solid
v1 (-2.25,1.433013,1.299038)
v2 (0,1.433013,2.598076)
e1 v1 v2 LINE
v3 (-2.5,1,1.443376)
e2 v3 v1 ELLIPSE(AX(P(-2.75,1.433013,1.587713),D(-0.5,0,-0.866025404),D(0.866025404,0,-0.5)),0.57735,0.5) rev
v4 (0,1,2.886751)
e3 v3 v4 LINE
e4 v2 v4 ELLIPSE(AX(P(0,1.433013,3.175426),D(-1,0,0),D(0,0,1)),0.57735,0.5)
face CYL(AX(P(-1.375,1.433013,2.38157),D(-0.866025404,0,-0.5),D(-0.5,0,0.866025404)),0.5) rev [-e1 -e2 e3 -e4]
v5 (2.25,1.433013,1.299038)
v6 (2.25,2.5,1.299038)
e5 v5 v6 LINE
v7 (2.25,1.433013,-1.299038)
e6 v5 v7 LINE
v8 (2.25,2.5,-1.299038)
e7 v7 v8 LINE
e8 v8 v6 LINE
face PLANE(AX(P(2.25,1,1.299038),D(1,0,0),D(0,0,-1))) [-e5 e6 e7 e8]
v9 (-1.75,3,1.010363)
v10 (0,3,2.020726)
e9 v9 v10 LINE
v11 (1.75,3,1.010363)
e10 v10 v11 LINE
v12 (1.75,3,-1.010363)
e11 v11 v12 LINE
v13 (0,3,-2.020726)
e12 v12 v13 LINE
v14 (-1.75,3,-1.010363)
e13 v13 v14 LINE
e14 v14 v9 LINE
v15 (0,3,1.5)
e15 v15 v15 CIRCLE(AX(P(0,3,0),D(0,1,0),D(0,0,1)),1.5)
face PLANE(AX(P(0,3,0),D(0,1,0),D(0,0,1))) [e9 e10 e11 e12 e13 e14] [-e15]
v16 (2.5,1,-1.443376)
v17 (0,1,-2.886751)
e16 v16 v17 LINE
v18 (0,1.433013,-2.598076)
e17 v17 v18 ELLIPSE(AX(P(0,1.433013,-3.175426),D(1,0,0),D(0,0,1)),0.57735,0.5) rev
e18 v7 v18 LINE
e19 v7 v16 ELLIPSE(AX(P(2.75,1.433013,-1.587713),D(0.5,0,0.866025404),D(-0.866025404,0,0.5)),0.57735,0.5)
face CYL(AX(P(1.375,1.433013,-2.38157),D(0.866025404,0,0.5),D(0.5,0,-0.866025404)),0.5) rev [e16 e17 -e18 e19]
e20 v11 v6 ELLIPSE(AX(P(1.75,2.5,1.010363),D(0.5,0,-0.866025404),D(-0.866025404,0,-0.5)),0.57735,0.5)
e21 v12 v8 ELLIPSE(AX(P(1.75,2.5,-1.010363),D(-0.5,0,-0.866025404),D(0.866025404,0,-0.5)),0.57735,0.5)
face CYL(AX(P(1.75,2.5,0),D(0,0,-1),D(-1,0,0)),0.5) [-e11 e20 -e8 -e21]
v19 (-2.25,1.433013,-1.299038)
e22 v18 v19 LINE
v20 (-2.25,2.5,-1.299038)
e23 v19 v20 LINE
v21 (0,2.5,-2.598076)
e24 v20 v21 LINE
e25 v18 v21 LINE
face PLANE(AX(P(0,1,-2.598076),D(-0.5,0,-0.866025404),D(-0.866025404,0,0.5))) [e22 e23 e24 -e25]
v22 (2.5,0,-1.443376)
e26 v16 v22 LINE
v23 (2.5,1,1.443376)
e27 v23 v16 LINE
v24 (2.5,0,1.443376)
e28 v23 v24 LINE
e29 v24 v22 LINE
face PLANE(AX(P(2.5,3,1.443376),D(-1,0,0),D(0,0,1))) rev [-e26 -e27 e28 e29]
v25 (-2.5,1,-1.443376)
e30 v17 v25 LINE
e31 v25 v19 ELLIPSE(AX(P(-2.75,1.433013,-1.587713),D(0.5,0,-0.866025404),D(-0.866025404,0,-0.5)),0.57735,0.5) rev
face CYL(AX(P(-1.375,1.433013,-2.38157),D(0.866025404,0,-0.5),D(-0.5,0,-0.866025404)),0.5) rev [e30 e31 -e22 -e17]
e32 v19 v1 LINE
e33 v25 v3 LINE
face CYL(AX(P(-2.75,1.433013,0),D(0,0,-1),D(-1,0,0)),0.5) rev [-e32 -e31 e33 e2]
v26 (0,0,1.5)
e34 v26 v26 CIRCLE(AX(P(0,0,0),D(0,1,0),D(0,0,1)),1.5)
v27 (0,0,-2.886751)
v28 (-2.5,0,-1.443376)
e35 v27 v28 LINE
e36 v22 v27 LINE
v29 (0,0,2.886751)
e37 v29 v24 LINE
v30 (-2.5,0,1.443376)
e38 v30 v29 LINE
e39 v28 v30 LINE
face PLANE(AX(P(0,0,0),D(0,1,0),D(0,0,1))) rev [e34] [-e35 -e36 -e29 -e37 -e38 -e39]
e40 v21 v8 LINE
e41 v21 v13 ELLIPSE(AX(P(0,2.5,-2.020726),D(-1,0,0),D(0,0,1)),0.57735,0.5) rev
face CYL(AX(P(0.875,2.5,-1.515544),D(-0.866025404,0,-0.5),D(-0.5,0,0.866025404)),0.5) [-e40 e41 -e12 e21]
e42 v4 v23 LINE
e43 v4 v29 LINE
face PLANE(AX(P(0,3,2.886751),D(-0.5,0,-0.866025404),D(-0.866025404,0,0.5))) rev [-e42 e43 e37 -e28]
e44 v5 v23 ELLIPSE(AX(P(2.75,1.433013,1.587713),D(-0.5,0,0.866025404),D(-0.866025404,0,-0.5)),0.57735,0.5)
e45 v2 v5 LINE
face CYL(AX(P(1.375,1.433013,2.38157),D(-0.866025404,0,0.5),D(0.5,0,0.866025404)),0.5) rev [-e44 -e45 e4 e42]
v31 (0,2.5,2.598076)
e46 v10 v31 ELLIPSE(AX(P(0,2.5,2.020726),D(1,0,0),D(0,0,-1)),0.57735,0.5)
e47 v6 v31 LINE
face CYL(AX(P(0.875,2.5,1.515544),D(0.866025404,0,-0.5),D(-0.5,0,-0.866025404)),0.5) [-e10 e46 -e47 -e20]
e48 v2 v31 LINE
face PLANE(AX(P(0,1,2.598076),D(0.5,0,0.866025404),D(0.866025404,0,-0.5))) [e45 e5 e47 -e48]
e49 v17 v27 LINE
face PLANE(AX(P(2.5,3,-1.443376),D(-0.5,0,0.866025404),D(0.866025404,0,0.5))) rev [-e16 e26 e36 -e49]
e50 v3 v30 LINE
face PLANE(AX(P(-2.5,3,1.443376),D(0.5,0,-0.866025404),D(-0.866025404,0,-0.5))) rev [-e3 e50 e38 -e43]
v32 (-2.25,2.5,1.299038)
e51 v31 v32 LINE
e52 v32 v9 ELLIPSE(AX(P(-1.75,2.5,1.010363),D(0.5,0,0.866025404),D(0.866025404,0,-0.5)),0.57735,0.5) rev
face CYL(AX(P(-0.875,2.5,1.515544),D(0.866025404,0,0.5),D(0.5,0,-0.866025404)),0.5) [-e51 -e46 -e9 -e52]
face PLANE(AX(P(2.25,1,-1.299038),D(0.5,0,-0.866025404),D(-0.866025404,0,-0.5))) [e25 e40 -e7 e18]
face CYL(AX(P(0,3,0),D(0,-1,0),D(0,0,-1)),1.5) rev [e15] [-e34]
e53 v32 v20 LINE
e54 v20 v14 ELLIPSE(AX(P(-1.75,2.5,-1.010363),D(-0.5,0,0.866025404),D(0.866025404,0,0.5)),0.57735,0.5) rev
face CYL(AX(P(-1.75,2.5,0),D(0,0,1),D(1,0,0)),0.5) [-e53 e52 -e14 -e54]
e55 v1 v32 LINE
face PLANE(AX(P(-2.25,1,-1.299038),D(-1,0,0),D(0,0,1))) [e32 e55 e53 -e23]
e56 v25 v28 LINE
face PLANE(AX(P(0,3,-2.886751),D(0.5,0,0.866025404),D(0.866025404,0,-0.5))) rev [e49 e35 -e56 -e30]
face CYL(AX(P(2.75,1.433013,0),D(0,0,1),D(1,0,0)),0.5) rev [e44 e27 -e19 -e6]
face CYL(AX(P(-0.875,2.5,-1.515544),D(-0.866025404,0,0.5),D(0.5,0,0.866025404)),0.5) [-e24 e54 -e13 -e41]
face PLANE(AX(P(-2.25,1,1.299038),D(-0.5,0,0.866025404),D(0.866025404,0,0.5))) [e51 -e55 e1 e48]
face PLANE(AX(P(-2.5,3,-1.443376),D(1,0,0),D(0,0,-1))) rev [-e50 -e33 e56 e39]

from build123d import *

# Parameters (mm, degrees)
SKETCH1_R           = 1.5
BOSS_EXTRUDE1_DEPTH = 3
SKETCH2_R           = 3.632993492
CUT_EXTRUDE1_DEPTH  = 2
FILLET1_R           = 0.5


with BuildPart() as part:
    # Sketch1 → Boss-Extrude1 (new body)
    with BuildSketch(Plane(origin=(0, 0, 0), x_dir=(1, 0, 0), z_dir=(0, 1, 0))):
        Polygon((0, -2.886751346), (2.5, -1.443375673), (2.5, 1.443375673), (0, 2.886751346), (-2.5, 1.443375673), (-2.5, -1.443375673), align=None)
        with Locations(Location((0, 0, 0), (0, 0, 270))):
            Circle(SKETCH1_R, mode=Mode.SUBTRACT)
    extrude(amount=BOSS_EXTRUDE1_DEPTH)

    # Sketch2 → Cut-Extrude1 (cut)
    with BuildSketch(Plane(origin=(0, 3, 0), x_dir=(1, 0, 0), z_dir=(0, 1, 0))):
        Circle(SKETCH2_R)
        Polygon((2.25, 1.299038106), (0, 2.598076211), (-2.25, 1.299038106), (-2.25, -1.299038106), (0, -2.598076211), (2.25, -1.299038106), align=None, mode=Mode.SUBTRACT)
    extrude(amount=-CUT_EXTRUDE1_DEPTH, mode=Mode.SUBTRACT)

    # Fillet1
    # the kernel refuses this fillet: 0.5 mm, written as the material it adds along each edge
    with BuildSketch(Plane(origin=(-0.9375, 1, 3.139342089), x_dir=(0.5000000000000002, 7.10542735760069e-14, 0.8660254037844385), z_dir=(0.8660254037844386, 0, -0.5000000000000002))) as fillet1_piece_1_section:
        with BuildLine():
            CenterArc((0.5, -0.433012702), FILLET1_R, 120, 60)
            Line((0, -0.433012702), (0, 0))
            Line((0, 0), (0.25, 0))
        make_face()
    fillet1_piece_1 = extrude(amount=4.763139721, mode=Mode.PRIVATE)
    fillet1_piece_1 = split(fillet1_piece_1, bisect_by=Plane(origin=(2.25, 1, 3.139342089), z_dir=(-1, 0, 0)), keep=Keep.TOP, mode=Mode.PRIVATE)
    fillet1_piece_1 = split(fillet1_piece_1, bisect_by=Plane(origin=(-0.46875, 1, 2.327443273), z_dir=(0.4999999999999999, 0, -0.8660254037844387)), keep=Keep.TOP, mode=Mode.PRIVATE)
    add(fillet1_piece_1)
    with BuildSketch(Plane(origin=(2.25, 1, 2.38156986), x_dir=(1, 0, 0), z_dir=(0, 0, -1))) as fillet1_piece_2_section:
        with BuildLine():
            CenterArc((0.5, -0.433012702), FILLET1_R, 120, 60)
            Line((0, -0.433012702), (0, 0))
            Line((0, 0), (0.25, 0))
        make_face()
    fillet1_piece_2 = extrude(amount=4.763139721, mode=Mode.PRIVATE)
    fillet1_piece_2 = split(fillet1_piece_2, bisect_by=Plane(origin=(1.78125, 1, 1.569671044), z_dir=(-0.5000000000000002, 0, -0.8660254037844386)), keep=Keep.TOP, mode=Mode.PRIVATE)
    fillet1_piece_2 = split(fillet1_piece_2, bisect_by=Plane(origin=(3.84375, 1, -0.378886114), z_dir=(-0.49999999999999956, 0, 0.8660254037844389)), keep=Keep.TOP, mode=Mode.PRIVATE)
    add(fillet1_piece_2)
    with BuildSketch(Plane(origin=(3.1875, 1, -0.757772228), x_dir=(0.49999999999999956, 7.194245199570714e-14, -0.8660254037844388), z_dir=(-0.8660254037844389, 0, -0.49999999999999956))) as fillet1_piece_3_section:
        with BuildLine():
            CenterArc((0.5, -0.433012702), FILLET1_R, 120, 60)
            Line((0, -0.433012702), (0, 0))
            Line((0, 0), (0.25, 0))
        make_face()
    fillet1_piece_3 = extrude(amount=4.763139721, mode=Mode.PRIVATE)
    fillet1_piece_3 = split(fillet1_piece_3, bisect_by=Plane(origin=(2.25, 1, -0.757772228), z_dir=(-1, 0, 0)), keep=Keep.TOP, mode=Mode.PRIVATE)
    fillet1_piece_3 = split(fillet1_piece_3, bisect_by=Plane(origin=(1.59375, 1, -3.518228203), z_dir=(0.5000000000000002, 0, 0.8660254037844385)), keep=Keep.TOP, mode=Mode.PRIVATE)
    add(fillet1_piece_3)
    with BuildSketch(Plane(origin=(0.9375, 1, -3.139342089), x_dir=(-0.5000000000000003, 7.283063041540705e-14, -0.8660254037844386), z_dir=(-0.8660254037844386, 0, 0.5000000000000003))) as fillet1_piece_4_section:
        with BuildLine():
            CenterArc((0.5, -0.433012702), FILLET1_R, 120, 60)
            Line((0, -0.433012702), (0, 0))
            Line((0, 0), (0.25, 0))
        make_face()
    fillet1_piece_4 = extrude(amount=4.763139721, mode=Mode.PRIVATE)
    fillet1_piece_4 = split(fillet1_piece_4, bisect_by=Plane(origin=(0.46875, 1, -2.327443273), z_dir=(-0.49999999999999956, 0, 0.8660254037844389)), keep=Keep.TOP, mode=Mode.PRIVATE)
    fillet1_piece_4 = split(fillet1_piece_4, bisect_by=Plane(origin=(-2.25, 1, -3.139342089), z_dir=(1, 0, 0)), keep=Keep.TOP, mode=Mode.PRIVATE)
    add(fillet1_piece_4)
    with BuildSketch(Plane(origin=(-2.25, 1, -2.38156986), x_dir=(-1, 0, 0), z_dir=(0, 0, 1))) as fillet1_piece_5_section:
        with BuildLine():
            CenterArc((0.5, -0.433012702), FILLET1_R, 120, 60)
            Line((0, -0.433012702), (0, 0))
            Line((0, 0), (0.25, 0))
        make_face()
    fillet1_piece_5 = extrude(amount=4.763139721, mode=Mode.PRIVATE)
    fillet1_piece_5 = split(fillet1_piece_5, bisect_by=Plane(origin=(-3.84375, 1, 0.378886114), z_dir=(0.4999999999999999, 0, -0.8660254037844387)), keep=Keep.TOP, mode=Mode.PRIVATE)
    fillet1_piece_5 = split(fillet1_piece_5, bisect_by=Plane(origin=(-1.78125, 1, -1.569671044), z_dir=(0.5000000000000002, 0, 0.8660254037844385)), keep=Keep.TOP, mode=Mode.PRIVATE)
    add(fillet1_piece_5)
    with BuildSketch(Plane(origin=(-3.1875, 1, 0.757772228), x_dir=(-0.4999999999999999, 7.194245199570713e-14, 0.8660254037844387), z_dir=(0.8660254037844387, 0, 0.4999999999999999))) as fillet1_piece_6_section:
        with BuildLine():
            CenterArc((0.5, -0.433012702), FILLET1_R, 120, 60)
            Line((0, -0.433012702), (0, 0))
            Line((0, 0), (0.25, 0))
        make_face()
    fillet1_piece_6 = extrude(amount=4.763139721, mode=Mode.PRIVATE)
    fillet1_piece_6 = split(fillet1_piece_6, bisect_by=Plane(origin=(-1.59375, 1, 3.518228203), z_dir=(-0.5000000000000002, 0, -0.8660254037844386)), keep=Keep.TOP, mode=Mode.PRIVATE)
    fillet1_piece_6 = split(fillet1_piece_6, bisect_by=Plane(origin=(-2.25, 1, 0.757772228), z_dir=(1, 0, 0)), keep=Keep.TOP, mode=Mode.PRIVATE)
    add(fillet1_piece_6)
    with BuildSketch(Plane(origin=(-0.9375, 1, 3.139342089), x_dir=(0.5000000000000002, 7.10542735760069e-14, 0.8660254037844385), z_dir=(0.8660254037844386, 0, -0.5000000000000002))) as fillet1_piece_7a_section:
        with BuildLine():
            CenterArc((0.5, -0.433012702), FILLET1_R, 120, 60)
            Line((0, -0.433012702), (0, 0))
            Line((0, 0), (0.25, 0))
        make_face()
    fillet1_piece_7a = extrude(amount=4.763139721, mode=Mode.PRIVATE)
    fillet1_piece_7a = split(fillet1_piece_7a, bisect_by=Plane(origin=(-0.59375, 1, 2.543949624), z_dir=(0.49999999999999983, 0, -0.8660254037844387)), keep=Keep.TOP, mode=Mode.PRIVATE)
    fillet1_piece_7a = split(fillet1_piece_7a, bisect_by=Plane(origin=(-0.46875, 1, 2.327443273), z_dir=(-0.4999999999999999, 0, 0.8660254037844387)), keep=Keep.TOP, mode=Mode.PRIVATE)
    with BuildSketch(Plane(origin=(-3.1875, 1, 0.757772228), x_dir=(-0.4999999999999999, 7.194245199570713e-14, 0.8660254037844387), z_dir=(0.8660254037844387, 0, 0.4999999999999999))) as fillet1_piece_7b_section:
        with BuildLine():
            CenterArc((0.5, -0.433012702), FILLET1_R, 120, 60)
            Line((0, -0.433012702), (0, 0))
            Line((0, 0), (0.25, 0))
        make_face()
    fillet1_piece_7b = extrude(amount=4.763139721, mode=Mode.PRIVATE)
    fillet1_piece_7b = split(fillet1_piece_7b, bisect_by=Plane(origin=(-1.46875, 1, 3.734734554), z_dir=(-0.5000000000000001, 0, -0.8660254037844387)), keep=Keep.TOP, mode=Mode.PRIVATE)
    fillet1_piece_7b = split(fillet1_piece_7b, bisect_by=Plane(origin=(-1.59375, 1, 3.518228203), z_dir=(0.5000000000000002, 0, 0.8660254037844386)), keep=Keep.TOP, mode=Mode.PRIVATE)
    fillet1_piece_7 = fillet1_piece_7a & fillet1_piece_7b
    add(fillet1_piece_7)
    with BuildSketch(Plane(origin=(2.25, 1, 2.38156986), x_dir=(1, 0, 0), z_dir=(0, 0, -1))) as fillet1_piece_8a_section:
        with BuildLine():
            CenterArc((0.5, -0.433012702), FILLET1_R, 120, 60)
            Line((0, -0.433012702), (0, 0))
            Line((0, 0), (0.25, 0))
        make_face()
    fillet1_piece_8a = extrude(amount=4.763139721, mode=Mode.PRIVATE)
    fillet1_piece_8a = split(fillet1_piece_8a, bisect_by=Plane(origin=(1.90625, 1, 1.786177395), z_dir=(-0.5000000000000001, 0, -0.8660254037844387)), keep=Keep.TOP, mode=Mode.PRIVATE)
    fillet1_piece_8a = split(fillet1_piece_8a, bisect_by=Plane(origin=(1.78125, 1, 1.569671044), z_dir=(0.5000000000000002, 0, 0.8660254037844386)), keep=Keep.TOP, mode=Mode.PRIVATE)
    with BuildSketch(Plane(origin=(-0.9375, 1, 3.139342089), x_dir=(0.5000000000000002, 7.10542735760069e-14, 0.8660254037844385), z_dir=(0.8660254037844386, 0, -0.5000000000000002))) as fillet1_piece_8b_section:
        with BuildLine():
            CenterArc((0.5, -0.433012702), FILLET1_R, 120, 60)
            Line((0, -0.433012702), (0, 0))
            Line((0, 0), (0.25, 0))
        make_face()
    fillet1_piece_8b = extrude(amount=4.763139721, mode=Mode.PRIVATE)
    fillet1_piece_8b = split(fillet1_piece_8b, bisect_by=Plane(origin=(2.5, 1, 3.139342089), z_dir=(-1, 0, 0)), keep=Keep.TOP, mode=Mode.PRIVATE)
    fillet1_piece_8b = split(fillet1_piece_8b, bisect_by=Plane(origin=(2.25, 1, 3.139342089), z_dir=(1, 0, 0)), keep=Keep.TOP, mode=Mode.PRIVATE)
    fillet1_piece_8 = fillet1_piece_8a & fillet1_piece_8b
    add(fillet1_piece_8)
    with BuildSketch(Plane(origin=(2.25, 1, 2.38156986), x_dir=(1, 0, 0), z_dir=(0, 0, -1))) as fillet1_piece_9a_section:
        with BuildLine():
            CenterArc((0.5, -0.433012702), FILLET1_R, 120, 60)
            Line((0, -0.433012702), (0, 0))
            Line((0, 0), (0.25, 0))
        make_face()
    fillet1_piece_9a = extrude(amount=4.763139721, mode=Mode.PRIVATE)
    fillet1_piece_9a = split(fillet1_piece_9a, bisect_by=Plane(origin=(3.96875, 1, -0.595392465), z_dir=(-0.49999999999999967, 0, 0.8660254037844388)), keep=Keep.TOP, mode=Mode.PRIVATE)
    fillet1_piece_9a = split(fillet1_piece_9a, bisect_by=Plane(origin=(3.84375, 1, -0.378886114), z_dir=(0.49999999999999956, 0, -0.8660254037844389)), keep=Keep.TOP, mode=Mode.PRIVATE)
    with BuildSketch(Plane(origin=(3.1875, 1, -0.757772228), x_dir=(0.49999999999999956, 7.194245199570714e-14, -0.8660254037844388), z_dir=(-0.8660254037844389, 0, -0.49999999999999956))) as fillet1_piece_9b_section:
        with BuildLine():
            CenterArc((0.5, -0.433012702), FILLET1_R, 120, 60)
            Line((0, -0.433012702), (0, 0))
            Line((0, 0), (0.25, 0))
        make_face()
    fillet1_piece_9b = extrude(amount=4.763139721, mode=Mode.PRIVATE)
    fillet1_piece_9b = split(fillet1_piece_9b, bisect_by=Plane(origin=(2.5, 1, -0.757772228), z_dir=(-1, 0, 0)), keep=Keep.TOP, mode=Mode.PRIVATE)
    fillet1_piece_9b = split(fillet1_piece_9b, bisect_by=Plane(origin=(2.25, 1, -0.757772228), z_dir=(1, 0, 0)), keep=Keep.TOP, mode=Mode.PRIVATE)
    fillet1_piece_9 = fillet1_piece_9a & fillet1_piece_9b
    add(fillet1_piece_9)
    with BuildSketch(Plane(origin=(3.1875, 1, -0.757772228), x_dir=(0.49999999999999956, 7.194245199570714e-14, -0.8660254037844388), z_dir=(-0.8660254037844389, 0, -0.49999999999999956))) as fillet1_piece_10a_section:
        with BuildLine():
            CenterArc((0.5, -0.433012702), FILLET1_R, 120, 60)
            Line((0, -0.433012702), (0, 0))
            Line((0, 0), (0.25, 0))
        make_face()
    fillet1_piece_10a = extrude(amount=4.763139721, mode=Mode.PRIVATE)
    fillet1_piece_10a = split(fillet1_piece_10a, bisect_by=Plane(origin=(1.46875, 1, -3.734734554), z_dir=(0.5000000000000002, 0, 0.8660254037844386)), keep=Keep.TOP, mode=Mode.PRIVATE)
    fillet1_piece_10a = split(fillet1_piece_10a, bisect_by=Plane(origin=(1.59375, 1, -3.518228203), z_dir=(-0.5000000000000002, 0, -0.8660254037844385)), keep=Keep.TOP, mode=Mode.PRIVATE)
    with BuildSketch(Plane(origin=(0.9375, 1, -3.139342089), x_dir=(-0.5000000000000003, 7.283063041540705e-14, -0.8660254037844386), z_dir=(-0.8660254037844386, 0, 0.5000000000000003))) as fillet1_piece_10b_section:
        with BuildLine():
            CenterArc((0.5, -0.433012702), FILLET1_R, 120, 60)
            Line((0, -0.433012702), (0, 0))
            Line((0, 0), (0.25, 0))
        make_face()
    fillet1_piece_10b = extrude(amount=4.763139721, mode=Mode.PRIVATE)
    fillet1_piece_10b = split(fillet1_piece_10b, bisect_by=Plane(origin=(0.59375, 1, -2.543949624), z_dir=(-0.49999999999999967, 0, 0.8660254037844388)), keep=Keep.TOP, mode=Mode.PRIVATE)
    fillet1_piece_10b = split(fillet1_piece_10b, bisect_by=Plane(origin=(0.46875, 1, -2.327443273), z_dir=(0.49999999999999956, 0, -0.8660254037844389)), keep=Keep.TOP, mode=Mode.PRIVATE)
    fillet1_piece_10 = fillet1_piece_10a & fillet1_piece_10b
    add(fillet1_piece_10)
    with BuildSketch(Plane(origin=(0.9375, 1, -3.139342089), x_dir=(-0.5000000000000003, 7.283063041540705e-14, -0.8660254037844386), z_dir=(-0.8660254037844386, 0, 0.5000000000000003))) as fillet1_piece_11a_section:
        with BuildLine():
            CenterArc((0.5, -0.433012702), FILLET1_R, 120, 60)
            Line((0, -0.433012702), (0, 0))
            Line((0, 0), (0.25, 0))
        make_face()
    fillet1_piece_11a = extrude(amount=4.763139721, mode=Mode.PRIVATE)
    fillet1_piece_11a = split(fillet1_piece_11a, bisect_by=Plane(origin=(-2.5, 1, -3.139342089), z_dir=(1, 0, 0)), keep=Keep.TOP, mode=Mode.PRIVATE)
    fillet1_piece_11a = split(fillet1_piece_11a, bisect_by=Plane(origin=(-2.25, 1, -3.139342089), z_dir=(-1, 0, 0)), keep=Keep.TOP, mode=Mode.PRIVATE)
    with BuildSketch(Plane(origin=(-2.25, 1, -2.38156986), x_dir=(-1, 0, 0), z_dir=(0, 0, 1))) as fillet1_piece_11b_section:
        with BuildLine():
            CenterArc((0.5, -0.433012702), FILLET1_R, 120, 60)
            Line((0, -0.433012702), (0, 0))
            Line((0, 0), (0.25, 0))
        make_face()
    fillet1_piece_11b = extrude(amount=4.763139721, mode=Mode.PRIVATE)
    fillet1_piece_11b = split(fillet1_piece_11b, bisect_by=Plane(origin=(-1.90625, 1, -1.786177395), z_dir=(0.5000000000000002, 0, 0.8660254037844386)), keep=Keep.TOP, mode=Mode.PRIVATE)
    fillet1_piece_11b = split(fillet1_piece_11b, bisect_by=Plane(origin=(-1.78125, 1, -1.569671044), z_dir=(-0.5000000000000002, 0, -0.8660254037844385)), keep=Keep.TOP, mode=Mode.PRIVATE)
    fillet1_piece_11 = fillet1_piece_11a & fillet1_piece_11b
    add(fillet1_piece_11)
    with BuildSketch(Plane(origin=(-3.1875, 1, 0.757772228), x_dir=(-0.4999999999999999, 7.194245199570713e-14, 0.8660254037844387), z_dir=(0.8660254037844387, 0, 0.4999999999999999))) as fillet1_piece_12a_section:
        with BuildLine():
            CenterArc((0.5, -0.433012702), FILLET1_R, 120, 60)
            Line((0, -0.433012702), (0, 0))
            Line((0, 0), (0.25, 0))
        make_face()
    fillet1_piece_12a = extrude(amount=4.763139721, mode=Mode.PRIVATE)
    fillet1_piece_12a = split(fillet1_piece_12a, bisect_by=Plane(origin=(-2.5, 1, 0.757772228), z_dir=(1, 0, 0)), keep=Keep.TOP, mode=Mode.PRIVATE)
    fillet1_piece_12a = split(fillet1_piece_12a, bisect_by=Plane(origin=(-2.25, 1, 0.757772228), z_dir=(-1, 0, 0)), keep=Keep.TOP, mode=Mode.PRIVATE)
    with BuildSketch(Plane(origin=(-2.25, 1, -2.38156986), x_dir=(-1, 0, 0), z_dir=(0, 0, 1))) as fillet1_piece_12b_section:
        with BuildLine():
            CenterArc((0.5, -0.433012702), FILLET1_R, 120, 60)
            Line((0, -0.433012702), (0, 0))
            Line((0, 0), (0.25, 0))
        make_face()
    fillet1_piece_12b = extrude(amount=4.763139721, mode=Mode.PRIVATE)
    fillet1_piece_12b = split(fillet1_piece_12b, bisect_by=Plane(origin=(-3.96875, 1, 0.595392465), z_dir=(0.49999999999999983, 0, -0.8660254037844387)), keep=Keep.TOP, mode=Mode.PRIVATE)
    fillet1_piece_12b = split(fillet1_piece_12b, bisect_by=Plane(origin=(-3.84375, 1, 0.378886114), z_dir=(-0.4999999999999999, 0, 0.8660254037844387)), keep=Keep.TOP, mode=Mode.PRIVATE)
    fillet1_piece_12 = fillet1_piece_12a & fillet1_piece_12b
    add(fillet1_piece_12)
    # the kernel refuses this fillet: 0.5 mm, written as the material it takes off along each edge
    with BuildSketch(Plane(origin=(2.25, 3, 2.549038106), x_dir=(0, -1, 0), z_dir=(0, 0, -1)), Plane(origin=(-1.082531755, 3, 3.223076211), x_dir=(0, -1, 0), z_dir=(0.8660254037844386, 0, -0.5000000000000002)), Plane(origin=(-3.332531755, 3, 0.674038106), x_dir=(0, -1, 0), z_dir=(0.8660254037844387, 0, 0.4999999999999999)), Plane(origin=(-2.25, 3, -2.549038106), x_dir=(0, -1, 0), z_dir=(0, 0, 1)), Plane(origin=(1.082531755, 3, -3.223076211), x_dir=(0, -1, 0), z_dir=(-0.8660254037844386, 0, 0.5000000000000003)), Plane(origin=(3.332531755, 3, -0.674038106), x_dir=(0, -1, 0), z_dir=(-0.8660254037844389, 0, -0.49999999999999956))) as fillet1_2_piece_1:
        with BuildLine():
            CenterArc((FILLET1_R, FILLET1_R), FILLET1_R, 180, 90)
            Line((0, FILLET1_R), (0, 0))
            Line((0, 0), (FILLET1_R, 0))
        make_face()
    extrude(amount=5.098076211, mode=Mode.SUBTRACT)


solid = part.part
